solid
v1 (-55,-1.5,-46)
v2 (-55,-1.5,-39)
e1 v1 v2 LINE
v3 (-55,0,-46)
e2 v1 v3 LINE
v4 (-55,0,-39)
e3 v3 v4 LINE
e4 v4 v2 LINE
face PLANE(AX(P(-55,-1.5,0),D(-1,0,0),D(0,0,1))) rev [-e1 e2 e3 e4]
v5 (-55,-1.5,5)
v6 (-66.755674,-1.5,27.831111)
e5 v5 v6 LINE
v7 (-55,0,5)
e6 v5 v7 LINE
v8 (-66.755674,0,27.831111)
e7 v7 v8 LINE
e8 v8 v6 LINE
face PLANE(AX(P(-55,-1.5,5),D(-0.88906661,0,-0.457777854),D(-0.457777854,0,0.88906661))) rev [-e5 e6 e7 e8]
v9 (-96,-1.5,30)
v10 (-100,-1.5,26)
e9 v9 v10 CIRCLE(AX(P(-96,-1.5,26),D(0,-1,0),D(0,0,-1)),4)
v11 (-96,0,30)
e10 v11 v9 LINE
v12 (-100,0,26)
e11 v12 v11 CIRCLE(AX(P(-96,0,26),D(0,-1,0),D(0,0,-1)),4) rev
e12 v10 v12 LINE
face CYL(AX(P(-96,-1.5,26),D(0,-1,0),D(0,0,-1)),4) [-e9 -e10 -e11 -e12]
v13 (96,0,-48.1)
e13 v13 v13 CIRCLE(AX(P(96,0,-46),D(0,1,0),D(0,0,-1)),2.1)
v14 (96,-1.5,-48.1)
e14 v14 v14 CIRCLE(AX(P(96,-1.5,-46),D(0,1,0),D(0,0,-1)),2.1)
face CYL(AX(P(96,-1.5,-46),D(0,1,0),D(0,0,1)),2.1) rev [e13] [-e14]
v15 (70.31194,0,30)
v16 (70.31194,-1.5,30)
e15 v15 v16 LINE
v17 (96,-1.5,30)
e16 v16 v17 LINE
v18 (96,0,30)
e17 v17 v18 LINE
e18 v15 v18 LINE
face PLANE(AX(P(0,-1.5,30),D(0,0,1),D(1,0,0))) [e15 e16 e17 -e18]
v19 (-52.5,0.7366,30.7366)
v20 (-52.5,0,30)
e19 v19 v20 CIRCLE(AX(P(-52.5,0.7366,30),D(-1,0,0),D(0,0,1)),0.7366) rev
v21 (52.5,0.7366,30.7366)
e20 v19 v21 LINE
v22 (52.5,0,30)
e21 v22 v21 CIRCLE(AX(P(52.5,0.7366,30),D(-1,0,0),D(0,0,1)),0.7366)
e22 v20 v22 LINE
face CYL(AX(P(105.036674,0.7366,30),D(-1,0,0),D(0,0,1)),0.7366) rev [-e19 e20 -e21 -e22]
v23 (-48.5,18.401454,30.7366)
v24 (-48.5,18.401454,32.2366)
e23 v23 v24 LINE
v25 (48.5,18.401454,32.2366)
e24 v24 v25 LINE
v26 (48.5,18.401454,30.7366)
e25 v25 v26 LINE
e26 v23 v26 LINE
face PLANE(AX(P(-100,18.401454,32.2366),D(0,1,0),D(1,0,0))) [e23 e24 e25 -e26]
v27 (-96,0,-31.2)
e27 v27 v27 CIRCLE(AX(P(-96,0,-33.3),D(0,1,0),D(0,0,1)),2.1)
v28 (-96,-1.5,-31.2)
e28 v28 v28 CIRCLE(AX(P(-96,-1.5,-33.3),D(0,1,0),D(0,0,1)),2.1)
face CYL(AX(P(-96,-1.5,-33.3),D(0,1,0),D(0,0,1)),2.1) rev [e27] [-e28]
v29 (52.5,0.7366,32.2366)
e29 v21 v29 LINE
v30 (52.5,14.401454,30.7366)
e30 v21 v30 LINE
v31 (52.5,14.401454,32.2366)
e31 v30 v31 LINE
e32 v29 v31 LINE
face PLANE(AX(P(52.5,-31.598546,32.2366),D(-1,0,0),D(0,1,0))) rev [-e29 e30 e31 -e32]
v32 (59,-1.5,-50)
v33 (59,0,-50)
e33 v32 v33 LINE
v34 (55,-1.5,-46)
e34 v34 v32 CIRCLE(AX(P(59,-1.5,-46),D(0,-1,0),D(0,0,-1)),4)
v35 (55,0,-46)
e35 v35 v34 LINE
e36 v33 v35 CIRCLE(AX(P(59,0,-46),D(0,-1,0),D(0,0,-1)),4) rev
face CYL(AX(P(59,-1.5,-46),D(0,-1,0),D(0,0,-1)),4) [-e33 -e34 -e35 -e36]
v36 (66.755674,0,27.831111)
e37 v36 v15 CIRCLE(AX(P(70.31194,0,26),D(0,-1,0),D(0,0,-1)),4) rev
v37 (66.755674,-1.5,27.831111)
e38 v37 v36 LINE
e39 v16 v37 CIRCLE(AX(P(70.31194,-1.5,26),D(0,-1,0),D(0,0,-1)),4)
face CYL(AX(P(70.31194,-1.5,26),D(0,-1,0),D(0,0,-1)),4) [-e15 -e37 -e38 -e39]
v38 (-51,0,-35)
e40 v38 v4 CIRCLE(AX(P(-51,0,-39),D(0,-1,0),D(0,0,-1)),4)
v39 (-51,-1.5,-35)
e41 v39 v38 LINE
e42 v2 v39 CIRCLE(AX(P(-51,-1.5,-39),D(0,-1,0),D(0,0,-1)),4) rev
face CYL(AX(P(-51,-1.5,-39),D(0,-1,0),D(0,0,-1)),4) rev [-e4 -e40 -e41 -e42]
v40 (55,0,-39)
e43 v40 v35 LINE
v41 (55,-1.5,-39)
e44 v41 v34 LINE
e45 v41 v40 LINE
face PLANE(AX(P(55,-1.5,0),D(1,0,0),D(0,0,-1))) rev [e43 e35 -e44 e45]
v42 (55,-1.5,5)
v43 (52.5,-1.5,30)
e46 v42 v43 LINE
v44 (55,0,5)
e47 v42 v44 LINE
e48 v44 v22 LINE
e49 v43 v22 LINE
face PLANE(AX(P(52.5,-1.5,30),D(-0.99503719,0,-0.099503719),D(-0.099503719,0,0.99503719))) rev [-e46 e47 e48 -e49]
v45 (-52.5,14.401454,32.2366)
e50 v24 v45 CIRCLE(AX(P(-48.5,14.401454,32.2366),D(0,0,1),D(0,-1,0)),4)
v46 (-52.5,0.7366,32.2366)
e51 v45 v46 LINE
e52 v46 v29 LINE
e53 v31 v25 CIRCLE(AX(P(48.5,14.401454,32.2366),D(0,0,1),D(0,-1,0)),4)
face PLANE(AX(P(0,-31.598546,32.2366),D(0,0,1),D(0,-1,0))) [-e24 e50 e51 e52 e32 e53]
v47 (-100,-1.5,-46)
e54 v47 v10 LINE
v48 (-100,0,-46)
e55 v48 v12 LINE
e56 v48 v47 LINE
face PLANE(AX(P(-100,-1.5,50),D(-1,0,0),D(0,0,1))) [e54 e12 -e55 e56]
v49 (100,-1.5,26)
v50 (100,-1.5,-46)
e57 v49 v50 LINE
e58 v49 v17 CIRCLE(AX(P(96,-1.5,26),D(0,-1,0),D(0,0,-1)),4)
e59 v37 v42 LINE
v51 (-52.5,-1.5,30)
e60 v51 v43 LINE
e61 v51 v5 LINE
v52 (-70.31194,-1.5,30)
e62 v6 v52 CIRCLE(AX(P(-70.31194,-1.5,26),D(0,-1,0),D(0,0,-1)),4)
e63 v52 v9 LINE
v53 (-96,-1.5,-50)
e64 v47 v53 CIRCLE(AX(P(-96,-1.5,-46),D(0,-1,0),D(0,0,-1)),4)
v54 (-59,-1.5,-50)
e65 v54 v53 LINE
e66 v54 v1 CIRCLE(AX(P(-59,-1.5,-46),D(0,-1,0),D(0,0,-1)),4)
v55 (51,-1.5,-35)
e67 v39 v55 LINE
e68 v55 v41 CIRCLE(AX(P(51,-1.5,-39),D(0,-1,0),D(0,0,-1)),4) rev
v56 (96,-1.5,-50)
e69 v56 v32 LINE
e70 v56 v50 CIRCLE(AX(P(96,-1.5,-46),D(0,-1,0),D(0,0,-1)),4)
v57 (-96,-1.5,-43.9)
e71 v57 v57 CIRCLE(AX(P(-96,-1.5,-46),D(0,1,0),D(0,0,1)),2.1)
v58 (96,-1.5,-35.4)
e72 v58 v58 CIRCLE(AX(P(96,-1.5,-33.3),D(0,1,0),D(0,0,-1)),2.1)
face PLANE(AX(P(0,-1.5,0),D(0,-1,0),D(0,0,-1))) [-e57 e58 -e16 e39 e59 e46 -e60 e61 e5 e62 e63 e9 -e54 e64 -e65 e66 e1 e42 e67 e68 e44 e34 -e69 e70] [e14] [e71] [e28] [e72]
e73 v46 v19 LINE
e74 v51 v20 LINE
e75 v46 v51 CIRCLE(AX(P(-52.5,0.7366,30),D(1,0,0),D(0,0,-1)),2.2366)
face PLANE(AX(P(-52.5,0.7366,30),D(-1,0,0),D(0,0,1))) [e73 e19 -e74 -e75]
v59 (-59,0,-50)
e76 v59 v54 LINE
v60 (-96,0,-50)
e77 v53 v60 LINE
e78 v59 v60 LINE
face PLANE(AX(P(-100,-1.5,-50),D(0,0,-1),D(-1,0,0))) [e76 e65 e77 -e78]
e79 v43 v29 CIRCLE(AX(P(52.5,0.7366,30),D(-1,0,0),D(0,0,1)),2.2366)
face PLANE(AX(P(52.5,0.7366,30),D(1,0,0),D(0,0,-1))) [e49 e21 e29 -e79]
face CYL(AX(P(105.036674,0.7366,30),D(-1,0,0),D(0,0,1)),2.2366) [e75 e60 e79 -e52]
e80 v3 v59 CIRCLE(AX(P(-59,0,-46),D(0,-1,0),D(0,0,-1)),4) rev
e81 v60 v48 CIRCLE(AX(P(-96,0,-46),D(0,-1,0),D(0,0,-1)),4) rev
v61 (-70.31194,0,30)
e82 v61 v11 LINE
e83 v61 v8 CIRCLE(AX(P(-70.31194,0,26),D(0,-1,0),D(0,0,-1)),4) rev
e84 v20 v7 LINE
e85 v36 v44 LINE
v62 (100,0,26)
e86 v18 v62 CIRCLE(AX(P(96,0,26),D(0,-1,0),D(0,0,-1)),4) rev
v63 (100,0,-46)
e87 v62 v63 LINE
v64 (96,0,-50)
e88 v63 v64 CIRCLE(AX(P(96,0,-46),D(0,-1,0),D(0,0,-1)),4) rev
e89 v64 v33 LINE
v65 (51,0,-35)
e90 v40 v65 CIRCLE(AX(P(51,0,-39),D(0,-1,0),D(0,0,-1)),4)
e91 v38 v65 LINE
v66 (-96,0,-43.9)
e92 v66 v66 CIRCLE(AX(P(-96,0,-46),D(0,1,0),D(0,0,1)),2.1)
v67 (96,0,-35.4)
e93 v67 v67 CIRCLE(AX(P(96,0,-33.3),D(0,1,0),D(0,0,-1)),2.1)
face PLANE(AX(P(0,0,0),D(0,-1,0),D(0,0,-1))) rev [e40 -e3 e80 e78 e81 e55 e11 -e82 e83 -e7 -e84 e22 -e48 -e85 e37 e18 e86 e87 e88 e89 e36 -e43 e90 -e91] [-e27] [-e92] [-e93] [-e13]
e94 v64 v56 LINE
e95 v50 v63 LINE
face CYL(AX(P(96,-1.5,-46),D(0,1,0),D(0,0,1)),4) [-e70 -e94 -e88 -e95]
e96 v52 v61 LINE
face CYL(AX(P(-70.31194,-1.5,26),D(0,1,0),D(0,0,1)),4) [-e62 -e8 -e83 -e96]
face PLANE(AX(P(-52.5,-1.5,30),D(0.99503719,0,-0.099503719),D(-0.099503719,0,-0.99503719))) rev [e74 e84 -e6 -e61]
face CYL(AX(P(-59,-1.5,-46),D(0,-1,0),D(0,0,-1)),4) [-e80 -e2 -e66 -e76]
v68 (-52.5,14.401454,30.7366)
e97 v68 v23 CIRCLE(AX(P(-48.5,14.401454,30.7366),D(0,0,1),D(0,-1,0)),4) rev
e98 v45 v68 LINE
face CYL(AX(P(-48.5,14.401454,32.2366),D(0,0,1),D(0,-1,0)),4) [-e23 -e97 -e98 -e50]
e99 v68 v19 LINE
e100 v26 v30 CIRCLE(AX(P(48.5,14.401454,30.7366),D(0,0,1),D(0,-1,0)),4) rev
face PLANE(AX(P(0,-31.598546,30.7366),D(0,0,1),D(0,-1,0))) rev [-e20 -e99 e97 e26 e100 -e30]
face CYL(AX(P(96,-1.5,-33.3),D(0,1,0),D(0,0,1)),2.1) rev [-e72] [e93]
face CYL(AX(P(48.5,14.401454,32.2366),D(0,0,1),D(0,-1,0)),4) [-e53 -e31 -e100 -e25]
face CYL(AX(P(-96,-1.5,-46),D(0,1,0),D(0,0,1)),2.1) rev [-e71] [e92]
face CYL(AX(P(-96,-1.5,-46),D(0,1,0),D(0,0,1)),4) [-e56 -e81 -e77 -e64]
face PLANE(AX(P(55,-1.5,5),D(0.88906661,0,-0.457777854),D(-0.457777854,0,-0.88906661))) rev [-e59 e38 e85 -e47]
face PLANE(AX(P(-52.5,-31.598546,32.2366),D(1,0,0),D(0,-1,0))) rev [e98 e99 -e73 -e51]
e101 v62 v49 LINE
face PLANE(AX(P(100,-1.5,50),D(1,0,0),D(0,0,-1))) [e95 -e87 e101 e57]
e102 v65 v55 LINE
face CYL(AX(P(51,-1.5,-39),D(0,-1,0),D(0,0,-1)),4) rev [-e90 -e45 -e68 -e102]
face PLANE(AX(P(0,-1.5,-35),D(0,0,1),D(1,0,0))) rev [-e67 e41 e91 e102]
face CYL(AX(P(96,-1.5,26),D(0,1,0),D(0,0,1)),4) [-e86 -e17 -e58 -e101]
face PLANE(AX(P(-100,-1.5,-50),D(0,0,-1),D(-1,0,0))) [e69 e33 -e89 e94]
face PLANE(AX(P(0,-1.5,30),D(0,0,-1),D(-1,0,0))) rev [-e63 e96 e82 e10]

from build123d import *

# Parameters (mm, degrees)
SKETCH_18_W            = 200
SKETCH_18_H            = 100
SM_BASE_FLANGE_3_DEPTH = 1.5
SKETCH_23_W            = 55
SKETCH_23_H            = 15
SKETCH_23_W_2          = 47.5
SKETCH_23_H_2          = 20
CUT_EXTRUDE_1_DEPTH    = 1.5
CUT_EXTRUDE_2_DEPTH    = 1.5
OTHER_START            = -52.5
OTHER_2_DEPTH          = 105
OTHER_2_2_DEPTH        = 105
FILLET_1_R             = 4
SKETCH_26_R            = 2.1
CUT_EXTRUDE_3_DEPTH    = 1.5


# Read off the part's stored shape, not the designer's step: 绘制的折弯2
# Sheet-metal steps are written as plain solids
with BuildPart() as part:
    # 草图18 → 基体-法兰3 (new body)
    with BuildSketch(Plane(origin=(0, 0, 0), x_dir=(1, 0, 0), z_dir=(0, 1, 0))):
        Rectangle(SKETCH_18_W, SKETCH_18_H)
    extrude(amount=-SM_BASE_FLANGE_3_DEPTH)

    # 草图23 → 切除-拉伸1 (cut)
    with BuildSketch(Plane(origin=(0, 0, 0), x_dir=(1, 0, 0), z_dir=(0, 1, 0))):
        with Locations((27.5, 42.5)):
            Rectangle(SKETCH_23_W, SKETCH_23_H)
        with Locations((-27.5, 42.5)):
            Rectangle(SKETCH_23_W, SKETCH_23_H)
        with Locations((76.25, -40)):
            Rectangle(SKETCH_23_W_2, SKETCH_23_H_2)
        with Locations((-76.25, -40)):
            Rectangle(SKETCH_23_W_2, SKETCH_23_H_2)
    extrude(amount=-CUT_EXTRUDE_1_DEPTH, mode=Mode.SUBTRACT)

    # 草图24 → 切除-拉伸2 (cut)
    with BuildSketch(Plane(origin=(0, 0, 0), x_dir=(1, 0, 0), z_dir=(0, 1, 0))):
        Polygon((-52.5, -30), (-55, -5), (-67.872428489, -30), align=None)
        Polygon((55, -5), (67.872428489, -30), (52.5, -30), align=None)
    extrude(amount=-CUT_EXTRUDE_2_DEPTH, mode=Mode.SUBTRACT)

    # Other 2 outline → Other 2 (cut)
    with BuildSketch(Plane.YZ.offset(OTHER_START)):
        with BuildLine():
            ThreePointArc((-1.5, 30), (-1.086838938, 31.295164082), (0, 32.111823856))
            Line((0, 32.111823856), (0, 50))
            Line((0, 50), (-1.5, 50))
            Line((-1.5, 50), (-1.5, 30))
        make_face()
    extrude(amount=OTHER_2_DEPTH, mode=Mode.SUBTRACT)

    # Other 2 2 outline → Other 2 2 (add)
    with BuildSketch(Plane.YZ.offset(OTHER_START)):
        with BuildLine():
            Line((18.401454181, 30.7366), (18.401454181, 32.2366))
            Line((18.401454181, 32.2366), (0.7366, 32.2366))
            ThreePointArc((0.7366, 32.2366), (0.363053267, 32.205185343), (0, 32.111823856))
            Line((0, 32.111823856), (0, 30))
            ThreePointArc((0, 30), (0.215745145, 30.520854855), (0.7366, 30.7366))
            Line((0.7366, 30.7366), (18.401454181, 30.7366))
        make_face()
    extrude(amount=OTHER_2_2_DEPTH)

    # 圆角1
    fillet_1_edges = [part.edges().sort_by_distance(p)[0] for p in [
        (67.872428489, -0.75, 30),
        (100, -0.75, 30),
        (100, -0.75, -50),
        (55, -0.75, -50),
        (55, -0.75, -35),
        (-55, -0.75, -35),
        (-55, -0.75, -50),
        (-100, -0.75, -50),
        (-100, -0.75, 30),
        (-67.872428489, -0.75, 30),
        (52.5, 18.401454181, 31.4866),
        (-52.5, 18.401454181, 31.4866),
    ]]
    fillet(fillet_1_edges, radius=FILLET_1_R)

    # 草图26 → 切除-拉伸3 (cut)
    with BuildSketch(Plane(origin=(0, 0, 0), x_dir=(1, 0, 0), z_dir=(0, 1, 0))):
        with Locations(Location((-96, 46, 0), (0, 0, 270))):
            Circle(SKETCH_26_R)
        with Locations(Location((-96, 33.3, 0), (0, 0, 270))):
            Circle(SKETCH_26_R)
        with Locations(Location((96, 33.3, 0), (0, 0, 90))):
            Circle(SKETCH_26_R)
        with Locations(Location((96, 46, 0), (0, 0, 90))):
            Circle(SKETCH_26_R)
    extrude(amount=-CUT_EXTRUDE_3_DEPTH, mode=Mode.SUBTRACT)


solid = part.part
